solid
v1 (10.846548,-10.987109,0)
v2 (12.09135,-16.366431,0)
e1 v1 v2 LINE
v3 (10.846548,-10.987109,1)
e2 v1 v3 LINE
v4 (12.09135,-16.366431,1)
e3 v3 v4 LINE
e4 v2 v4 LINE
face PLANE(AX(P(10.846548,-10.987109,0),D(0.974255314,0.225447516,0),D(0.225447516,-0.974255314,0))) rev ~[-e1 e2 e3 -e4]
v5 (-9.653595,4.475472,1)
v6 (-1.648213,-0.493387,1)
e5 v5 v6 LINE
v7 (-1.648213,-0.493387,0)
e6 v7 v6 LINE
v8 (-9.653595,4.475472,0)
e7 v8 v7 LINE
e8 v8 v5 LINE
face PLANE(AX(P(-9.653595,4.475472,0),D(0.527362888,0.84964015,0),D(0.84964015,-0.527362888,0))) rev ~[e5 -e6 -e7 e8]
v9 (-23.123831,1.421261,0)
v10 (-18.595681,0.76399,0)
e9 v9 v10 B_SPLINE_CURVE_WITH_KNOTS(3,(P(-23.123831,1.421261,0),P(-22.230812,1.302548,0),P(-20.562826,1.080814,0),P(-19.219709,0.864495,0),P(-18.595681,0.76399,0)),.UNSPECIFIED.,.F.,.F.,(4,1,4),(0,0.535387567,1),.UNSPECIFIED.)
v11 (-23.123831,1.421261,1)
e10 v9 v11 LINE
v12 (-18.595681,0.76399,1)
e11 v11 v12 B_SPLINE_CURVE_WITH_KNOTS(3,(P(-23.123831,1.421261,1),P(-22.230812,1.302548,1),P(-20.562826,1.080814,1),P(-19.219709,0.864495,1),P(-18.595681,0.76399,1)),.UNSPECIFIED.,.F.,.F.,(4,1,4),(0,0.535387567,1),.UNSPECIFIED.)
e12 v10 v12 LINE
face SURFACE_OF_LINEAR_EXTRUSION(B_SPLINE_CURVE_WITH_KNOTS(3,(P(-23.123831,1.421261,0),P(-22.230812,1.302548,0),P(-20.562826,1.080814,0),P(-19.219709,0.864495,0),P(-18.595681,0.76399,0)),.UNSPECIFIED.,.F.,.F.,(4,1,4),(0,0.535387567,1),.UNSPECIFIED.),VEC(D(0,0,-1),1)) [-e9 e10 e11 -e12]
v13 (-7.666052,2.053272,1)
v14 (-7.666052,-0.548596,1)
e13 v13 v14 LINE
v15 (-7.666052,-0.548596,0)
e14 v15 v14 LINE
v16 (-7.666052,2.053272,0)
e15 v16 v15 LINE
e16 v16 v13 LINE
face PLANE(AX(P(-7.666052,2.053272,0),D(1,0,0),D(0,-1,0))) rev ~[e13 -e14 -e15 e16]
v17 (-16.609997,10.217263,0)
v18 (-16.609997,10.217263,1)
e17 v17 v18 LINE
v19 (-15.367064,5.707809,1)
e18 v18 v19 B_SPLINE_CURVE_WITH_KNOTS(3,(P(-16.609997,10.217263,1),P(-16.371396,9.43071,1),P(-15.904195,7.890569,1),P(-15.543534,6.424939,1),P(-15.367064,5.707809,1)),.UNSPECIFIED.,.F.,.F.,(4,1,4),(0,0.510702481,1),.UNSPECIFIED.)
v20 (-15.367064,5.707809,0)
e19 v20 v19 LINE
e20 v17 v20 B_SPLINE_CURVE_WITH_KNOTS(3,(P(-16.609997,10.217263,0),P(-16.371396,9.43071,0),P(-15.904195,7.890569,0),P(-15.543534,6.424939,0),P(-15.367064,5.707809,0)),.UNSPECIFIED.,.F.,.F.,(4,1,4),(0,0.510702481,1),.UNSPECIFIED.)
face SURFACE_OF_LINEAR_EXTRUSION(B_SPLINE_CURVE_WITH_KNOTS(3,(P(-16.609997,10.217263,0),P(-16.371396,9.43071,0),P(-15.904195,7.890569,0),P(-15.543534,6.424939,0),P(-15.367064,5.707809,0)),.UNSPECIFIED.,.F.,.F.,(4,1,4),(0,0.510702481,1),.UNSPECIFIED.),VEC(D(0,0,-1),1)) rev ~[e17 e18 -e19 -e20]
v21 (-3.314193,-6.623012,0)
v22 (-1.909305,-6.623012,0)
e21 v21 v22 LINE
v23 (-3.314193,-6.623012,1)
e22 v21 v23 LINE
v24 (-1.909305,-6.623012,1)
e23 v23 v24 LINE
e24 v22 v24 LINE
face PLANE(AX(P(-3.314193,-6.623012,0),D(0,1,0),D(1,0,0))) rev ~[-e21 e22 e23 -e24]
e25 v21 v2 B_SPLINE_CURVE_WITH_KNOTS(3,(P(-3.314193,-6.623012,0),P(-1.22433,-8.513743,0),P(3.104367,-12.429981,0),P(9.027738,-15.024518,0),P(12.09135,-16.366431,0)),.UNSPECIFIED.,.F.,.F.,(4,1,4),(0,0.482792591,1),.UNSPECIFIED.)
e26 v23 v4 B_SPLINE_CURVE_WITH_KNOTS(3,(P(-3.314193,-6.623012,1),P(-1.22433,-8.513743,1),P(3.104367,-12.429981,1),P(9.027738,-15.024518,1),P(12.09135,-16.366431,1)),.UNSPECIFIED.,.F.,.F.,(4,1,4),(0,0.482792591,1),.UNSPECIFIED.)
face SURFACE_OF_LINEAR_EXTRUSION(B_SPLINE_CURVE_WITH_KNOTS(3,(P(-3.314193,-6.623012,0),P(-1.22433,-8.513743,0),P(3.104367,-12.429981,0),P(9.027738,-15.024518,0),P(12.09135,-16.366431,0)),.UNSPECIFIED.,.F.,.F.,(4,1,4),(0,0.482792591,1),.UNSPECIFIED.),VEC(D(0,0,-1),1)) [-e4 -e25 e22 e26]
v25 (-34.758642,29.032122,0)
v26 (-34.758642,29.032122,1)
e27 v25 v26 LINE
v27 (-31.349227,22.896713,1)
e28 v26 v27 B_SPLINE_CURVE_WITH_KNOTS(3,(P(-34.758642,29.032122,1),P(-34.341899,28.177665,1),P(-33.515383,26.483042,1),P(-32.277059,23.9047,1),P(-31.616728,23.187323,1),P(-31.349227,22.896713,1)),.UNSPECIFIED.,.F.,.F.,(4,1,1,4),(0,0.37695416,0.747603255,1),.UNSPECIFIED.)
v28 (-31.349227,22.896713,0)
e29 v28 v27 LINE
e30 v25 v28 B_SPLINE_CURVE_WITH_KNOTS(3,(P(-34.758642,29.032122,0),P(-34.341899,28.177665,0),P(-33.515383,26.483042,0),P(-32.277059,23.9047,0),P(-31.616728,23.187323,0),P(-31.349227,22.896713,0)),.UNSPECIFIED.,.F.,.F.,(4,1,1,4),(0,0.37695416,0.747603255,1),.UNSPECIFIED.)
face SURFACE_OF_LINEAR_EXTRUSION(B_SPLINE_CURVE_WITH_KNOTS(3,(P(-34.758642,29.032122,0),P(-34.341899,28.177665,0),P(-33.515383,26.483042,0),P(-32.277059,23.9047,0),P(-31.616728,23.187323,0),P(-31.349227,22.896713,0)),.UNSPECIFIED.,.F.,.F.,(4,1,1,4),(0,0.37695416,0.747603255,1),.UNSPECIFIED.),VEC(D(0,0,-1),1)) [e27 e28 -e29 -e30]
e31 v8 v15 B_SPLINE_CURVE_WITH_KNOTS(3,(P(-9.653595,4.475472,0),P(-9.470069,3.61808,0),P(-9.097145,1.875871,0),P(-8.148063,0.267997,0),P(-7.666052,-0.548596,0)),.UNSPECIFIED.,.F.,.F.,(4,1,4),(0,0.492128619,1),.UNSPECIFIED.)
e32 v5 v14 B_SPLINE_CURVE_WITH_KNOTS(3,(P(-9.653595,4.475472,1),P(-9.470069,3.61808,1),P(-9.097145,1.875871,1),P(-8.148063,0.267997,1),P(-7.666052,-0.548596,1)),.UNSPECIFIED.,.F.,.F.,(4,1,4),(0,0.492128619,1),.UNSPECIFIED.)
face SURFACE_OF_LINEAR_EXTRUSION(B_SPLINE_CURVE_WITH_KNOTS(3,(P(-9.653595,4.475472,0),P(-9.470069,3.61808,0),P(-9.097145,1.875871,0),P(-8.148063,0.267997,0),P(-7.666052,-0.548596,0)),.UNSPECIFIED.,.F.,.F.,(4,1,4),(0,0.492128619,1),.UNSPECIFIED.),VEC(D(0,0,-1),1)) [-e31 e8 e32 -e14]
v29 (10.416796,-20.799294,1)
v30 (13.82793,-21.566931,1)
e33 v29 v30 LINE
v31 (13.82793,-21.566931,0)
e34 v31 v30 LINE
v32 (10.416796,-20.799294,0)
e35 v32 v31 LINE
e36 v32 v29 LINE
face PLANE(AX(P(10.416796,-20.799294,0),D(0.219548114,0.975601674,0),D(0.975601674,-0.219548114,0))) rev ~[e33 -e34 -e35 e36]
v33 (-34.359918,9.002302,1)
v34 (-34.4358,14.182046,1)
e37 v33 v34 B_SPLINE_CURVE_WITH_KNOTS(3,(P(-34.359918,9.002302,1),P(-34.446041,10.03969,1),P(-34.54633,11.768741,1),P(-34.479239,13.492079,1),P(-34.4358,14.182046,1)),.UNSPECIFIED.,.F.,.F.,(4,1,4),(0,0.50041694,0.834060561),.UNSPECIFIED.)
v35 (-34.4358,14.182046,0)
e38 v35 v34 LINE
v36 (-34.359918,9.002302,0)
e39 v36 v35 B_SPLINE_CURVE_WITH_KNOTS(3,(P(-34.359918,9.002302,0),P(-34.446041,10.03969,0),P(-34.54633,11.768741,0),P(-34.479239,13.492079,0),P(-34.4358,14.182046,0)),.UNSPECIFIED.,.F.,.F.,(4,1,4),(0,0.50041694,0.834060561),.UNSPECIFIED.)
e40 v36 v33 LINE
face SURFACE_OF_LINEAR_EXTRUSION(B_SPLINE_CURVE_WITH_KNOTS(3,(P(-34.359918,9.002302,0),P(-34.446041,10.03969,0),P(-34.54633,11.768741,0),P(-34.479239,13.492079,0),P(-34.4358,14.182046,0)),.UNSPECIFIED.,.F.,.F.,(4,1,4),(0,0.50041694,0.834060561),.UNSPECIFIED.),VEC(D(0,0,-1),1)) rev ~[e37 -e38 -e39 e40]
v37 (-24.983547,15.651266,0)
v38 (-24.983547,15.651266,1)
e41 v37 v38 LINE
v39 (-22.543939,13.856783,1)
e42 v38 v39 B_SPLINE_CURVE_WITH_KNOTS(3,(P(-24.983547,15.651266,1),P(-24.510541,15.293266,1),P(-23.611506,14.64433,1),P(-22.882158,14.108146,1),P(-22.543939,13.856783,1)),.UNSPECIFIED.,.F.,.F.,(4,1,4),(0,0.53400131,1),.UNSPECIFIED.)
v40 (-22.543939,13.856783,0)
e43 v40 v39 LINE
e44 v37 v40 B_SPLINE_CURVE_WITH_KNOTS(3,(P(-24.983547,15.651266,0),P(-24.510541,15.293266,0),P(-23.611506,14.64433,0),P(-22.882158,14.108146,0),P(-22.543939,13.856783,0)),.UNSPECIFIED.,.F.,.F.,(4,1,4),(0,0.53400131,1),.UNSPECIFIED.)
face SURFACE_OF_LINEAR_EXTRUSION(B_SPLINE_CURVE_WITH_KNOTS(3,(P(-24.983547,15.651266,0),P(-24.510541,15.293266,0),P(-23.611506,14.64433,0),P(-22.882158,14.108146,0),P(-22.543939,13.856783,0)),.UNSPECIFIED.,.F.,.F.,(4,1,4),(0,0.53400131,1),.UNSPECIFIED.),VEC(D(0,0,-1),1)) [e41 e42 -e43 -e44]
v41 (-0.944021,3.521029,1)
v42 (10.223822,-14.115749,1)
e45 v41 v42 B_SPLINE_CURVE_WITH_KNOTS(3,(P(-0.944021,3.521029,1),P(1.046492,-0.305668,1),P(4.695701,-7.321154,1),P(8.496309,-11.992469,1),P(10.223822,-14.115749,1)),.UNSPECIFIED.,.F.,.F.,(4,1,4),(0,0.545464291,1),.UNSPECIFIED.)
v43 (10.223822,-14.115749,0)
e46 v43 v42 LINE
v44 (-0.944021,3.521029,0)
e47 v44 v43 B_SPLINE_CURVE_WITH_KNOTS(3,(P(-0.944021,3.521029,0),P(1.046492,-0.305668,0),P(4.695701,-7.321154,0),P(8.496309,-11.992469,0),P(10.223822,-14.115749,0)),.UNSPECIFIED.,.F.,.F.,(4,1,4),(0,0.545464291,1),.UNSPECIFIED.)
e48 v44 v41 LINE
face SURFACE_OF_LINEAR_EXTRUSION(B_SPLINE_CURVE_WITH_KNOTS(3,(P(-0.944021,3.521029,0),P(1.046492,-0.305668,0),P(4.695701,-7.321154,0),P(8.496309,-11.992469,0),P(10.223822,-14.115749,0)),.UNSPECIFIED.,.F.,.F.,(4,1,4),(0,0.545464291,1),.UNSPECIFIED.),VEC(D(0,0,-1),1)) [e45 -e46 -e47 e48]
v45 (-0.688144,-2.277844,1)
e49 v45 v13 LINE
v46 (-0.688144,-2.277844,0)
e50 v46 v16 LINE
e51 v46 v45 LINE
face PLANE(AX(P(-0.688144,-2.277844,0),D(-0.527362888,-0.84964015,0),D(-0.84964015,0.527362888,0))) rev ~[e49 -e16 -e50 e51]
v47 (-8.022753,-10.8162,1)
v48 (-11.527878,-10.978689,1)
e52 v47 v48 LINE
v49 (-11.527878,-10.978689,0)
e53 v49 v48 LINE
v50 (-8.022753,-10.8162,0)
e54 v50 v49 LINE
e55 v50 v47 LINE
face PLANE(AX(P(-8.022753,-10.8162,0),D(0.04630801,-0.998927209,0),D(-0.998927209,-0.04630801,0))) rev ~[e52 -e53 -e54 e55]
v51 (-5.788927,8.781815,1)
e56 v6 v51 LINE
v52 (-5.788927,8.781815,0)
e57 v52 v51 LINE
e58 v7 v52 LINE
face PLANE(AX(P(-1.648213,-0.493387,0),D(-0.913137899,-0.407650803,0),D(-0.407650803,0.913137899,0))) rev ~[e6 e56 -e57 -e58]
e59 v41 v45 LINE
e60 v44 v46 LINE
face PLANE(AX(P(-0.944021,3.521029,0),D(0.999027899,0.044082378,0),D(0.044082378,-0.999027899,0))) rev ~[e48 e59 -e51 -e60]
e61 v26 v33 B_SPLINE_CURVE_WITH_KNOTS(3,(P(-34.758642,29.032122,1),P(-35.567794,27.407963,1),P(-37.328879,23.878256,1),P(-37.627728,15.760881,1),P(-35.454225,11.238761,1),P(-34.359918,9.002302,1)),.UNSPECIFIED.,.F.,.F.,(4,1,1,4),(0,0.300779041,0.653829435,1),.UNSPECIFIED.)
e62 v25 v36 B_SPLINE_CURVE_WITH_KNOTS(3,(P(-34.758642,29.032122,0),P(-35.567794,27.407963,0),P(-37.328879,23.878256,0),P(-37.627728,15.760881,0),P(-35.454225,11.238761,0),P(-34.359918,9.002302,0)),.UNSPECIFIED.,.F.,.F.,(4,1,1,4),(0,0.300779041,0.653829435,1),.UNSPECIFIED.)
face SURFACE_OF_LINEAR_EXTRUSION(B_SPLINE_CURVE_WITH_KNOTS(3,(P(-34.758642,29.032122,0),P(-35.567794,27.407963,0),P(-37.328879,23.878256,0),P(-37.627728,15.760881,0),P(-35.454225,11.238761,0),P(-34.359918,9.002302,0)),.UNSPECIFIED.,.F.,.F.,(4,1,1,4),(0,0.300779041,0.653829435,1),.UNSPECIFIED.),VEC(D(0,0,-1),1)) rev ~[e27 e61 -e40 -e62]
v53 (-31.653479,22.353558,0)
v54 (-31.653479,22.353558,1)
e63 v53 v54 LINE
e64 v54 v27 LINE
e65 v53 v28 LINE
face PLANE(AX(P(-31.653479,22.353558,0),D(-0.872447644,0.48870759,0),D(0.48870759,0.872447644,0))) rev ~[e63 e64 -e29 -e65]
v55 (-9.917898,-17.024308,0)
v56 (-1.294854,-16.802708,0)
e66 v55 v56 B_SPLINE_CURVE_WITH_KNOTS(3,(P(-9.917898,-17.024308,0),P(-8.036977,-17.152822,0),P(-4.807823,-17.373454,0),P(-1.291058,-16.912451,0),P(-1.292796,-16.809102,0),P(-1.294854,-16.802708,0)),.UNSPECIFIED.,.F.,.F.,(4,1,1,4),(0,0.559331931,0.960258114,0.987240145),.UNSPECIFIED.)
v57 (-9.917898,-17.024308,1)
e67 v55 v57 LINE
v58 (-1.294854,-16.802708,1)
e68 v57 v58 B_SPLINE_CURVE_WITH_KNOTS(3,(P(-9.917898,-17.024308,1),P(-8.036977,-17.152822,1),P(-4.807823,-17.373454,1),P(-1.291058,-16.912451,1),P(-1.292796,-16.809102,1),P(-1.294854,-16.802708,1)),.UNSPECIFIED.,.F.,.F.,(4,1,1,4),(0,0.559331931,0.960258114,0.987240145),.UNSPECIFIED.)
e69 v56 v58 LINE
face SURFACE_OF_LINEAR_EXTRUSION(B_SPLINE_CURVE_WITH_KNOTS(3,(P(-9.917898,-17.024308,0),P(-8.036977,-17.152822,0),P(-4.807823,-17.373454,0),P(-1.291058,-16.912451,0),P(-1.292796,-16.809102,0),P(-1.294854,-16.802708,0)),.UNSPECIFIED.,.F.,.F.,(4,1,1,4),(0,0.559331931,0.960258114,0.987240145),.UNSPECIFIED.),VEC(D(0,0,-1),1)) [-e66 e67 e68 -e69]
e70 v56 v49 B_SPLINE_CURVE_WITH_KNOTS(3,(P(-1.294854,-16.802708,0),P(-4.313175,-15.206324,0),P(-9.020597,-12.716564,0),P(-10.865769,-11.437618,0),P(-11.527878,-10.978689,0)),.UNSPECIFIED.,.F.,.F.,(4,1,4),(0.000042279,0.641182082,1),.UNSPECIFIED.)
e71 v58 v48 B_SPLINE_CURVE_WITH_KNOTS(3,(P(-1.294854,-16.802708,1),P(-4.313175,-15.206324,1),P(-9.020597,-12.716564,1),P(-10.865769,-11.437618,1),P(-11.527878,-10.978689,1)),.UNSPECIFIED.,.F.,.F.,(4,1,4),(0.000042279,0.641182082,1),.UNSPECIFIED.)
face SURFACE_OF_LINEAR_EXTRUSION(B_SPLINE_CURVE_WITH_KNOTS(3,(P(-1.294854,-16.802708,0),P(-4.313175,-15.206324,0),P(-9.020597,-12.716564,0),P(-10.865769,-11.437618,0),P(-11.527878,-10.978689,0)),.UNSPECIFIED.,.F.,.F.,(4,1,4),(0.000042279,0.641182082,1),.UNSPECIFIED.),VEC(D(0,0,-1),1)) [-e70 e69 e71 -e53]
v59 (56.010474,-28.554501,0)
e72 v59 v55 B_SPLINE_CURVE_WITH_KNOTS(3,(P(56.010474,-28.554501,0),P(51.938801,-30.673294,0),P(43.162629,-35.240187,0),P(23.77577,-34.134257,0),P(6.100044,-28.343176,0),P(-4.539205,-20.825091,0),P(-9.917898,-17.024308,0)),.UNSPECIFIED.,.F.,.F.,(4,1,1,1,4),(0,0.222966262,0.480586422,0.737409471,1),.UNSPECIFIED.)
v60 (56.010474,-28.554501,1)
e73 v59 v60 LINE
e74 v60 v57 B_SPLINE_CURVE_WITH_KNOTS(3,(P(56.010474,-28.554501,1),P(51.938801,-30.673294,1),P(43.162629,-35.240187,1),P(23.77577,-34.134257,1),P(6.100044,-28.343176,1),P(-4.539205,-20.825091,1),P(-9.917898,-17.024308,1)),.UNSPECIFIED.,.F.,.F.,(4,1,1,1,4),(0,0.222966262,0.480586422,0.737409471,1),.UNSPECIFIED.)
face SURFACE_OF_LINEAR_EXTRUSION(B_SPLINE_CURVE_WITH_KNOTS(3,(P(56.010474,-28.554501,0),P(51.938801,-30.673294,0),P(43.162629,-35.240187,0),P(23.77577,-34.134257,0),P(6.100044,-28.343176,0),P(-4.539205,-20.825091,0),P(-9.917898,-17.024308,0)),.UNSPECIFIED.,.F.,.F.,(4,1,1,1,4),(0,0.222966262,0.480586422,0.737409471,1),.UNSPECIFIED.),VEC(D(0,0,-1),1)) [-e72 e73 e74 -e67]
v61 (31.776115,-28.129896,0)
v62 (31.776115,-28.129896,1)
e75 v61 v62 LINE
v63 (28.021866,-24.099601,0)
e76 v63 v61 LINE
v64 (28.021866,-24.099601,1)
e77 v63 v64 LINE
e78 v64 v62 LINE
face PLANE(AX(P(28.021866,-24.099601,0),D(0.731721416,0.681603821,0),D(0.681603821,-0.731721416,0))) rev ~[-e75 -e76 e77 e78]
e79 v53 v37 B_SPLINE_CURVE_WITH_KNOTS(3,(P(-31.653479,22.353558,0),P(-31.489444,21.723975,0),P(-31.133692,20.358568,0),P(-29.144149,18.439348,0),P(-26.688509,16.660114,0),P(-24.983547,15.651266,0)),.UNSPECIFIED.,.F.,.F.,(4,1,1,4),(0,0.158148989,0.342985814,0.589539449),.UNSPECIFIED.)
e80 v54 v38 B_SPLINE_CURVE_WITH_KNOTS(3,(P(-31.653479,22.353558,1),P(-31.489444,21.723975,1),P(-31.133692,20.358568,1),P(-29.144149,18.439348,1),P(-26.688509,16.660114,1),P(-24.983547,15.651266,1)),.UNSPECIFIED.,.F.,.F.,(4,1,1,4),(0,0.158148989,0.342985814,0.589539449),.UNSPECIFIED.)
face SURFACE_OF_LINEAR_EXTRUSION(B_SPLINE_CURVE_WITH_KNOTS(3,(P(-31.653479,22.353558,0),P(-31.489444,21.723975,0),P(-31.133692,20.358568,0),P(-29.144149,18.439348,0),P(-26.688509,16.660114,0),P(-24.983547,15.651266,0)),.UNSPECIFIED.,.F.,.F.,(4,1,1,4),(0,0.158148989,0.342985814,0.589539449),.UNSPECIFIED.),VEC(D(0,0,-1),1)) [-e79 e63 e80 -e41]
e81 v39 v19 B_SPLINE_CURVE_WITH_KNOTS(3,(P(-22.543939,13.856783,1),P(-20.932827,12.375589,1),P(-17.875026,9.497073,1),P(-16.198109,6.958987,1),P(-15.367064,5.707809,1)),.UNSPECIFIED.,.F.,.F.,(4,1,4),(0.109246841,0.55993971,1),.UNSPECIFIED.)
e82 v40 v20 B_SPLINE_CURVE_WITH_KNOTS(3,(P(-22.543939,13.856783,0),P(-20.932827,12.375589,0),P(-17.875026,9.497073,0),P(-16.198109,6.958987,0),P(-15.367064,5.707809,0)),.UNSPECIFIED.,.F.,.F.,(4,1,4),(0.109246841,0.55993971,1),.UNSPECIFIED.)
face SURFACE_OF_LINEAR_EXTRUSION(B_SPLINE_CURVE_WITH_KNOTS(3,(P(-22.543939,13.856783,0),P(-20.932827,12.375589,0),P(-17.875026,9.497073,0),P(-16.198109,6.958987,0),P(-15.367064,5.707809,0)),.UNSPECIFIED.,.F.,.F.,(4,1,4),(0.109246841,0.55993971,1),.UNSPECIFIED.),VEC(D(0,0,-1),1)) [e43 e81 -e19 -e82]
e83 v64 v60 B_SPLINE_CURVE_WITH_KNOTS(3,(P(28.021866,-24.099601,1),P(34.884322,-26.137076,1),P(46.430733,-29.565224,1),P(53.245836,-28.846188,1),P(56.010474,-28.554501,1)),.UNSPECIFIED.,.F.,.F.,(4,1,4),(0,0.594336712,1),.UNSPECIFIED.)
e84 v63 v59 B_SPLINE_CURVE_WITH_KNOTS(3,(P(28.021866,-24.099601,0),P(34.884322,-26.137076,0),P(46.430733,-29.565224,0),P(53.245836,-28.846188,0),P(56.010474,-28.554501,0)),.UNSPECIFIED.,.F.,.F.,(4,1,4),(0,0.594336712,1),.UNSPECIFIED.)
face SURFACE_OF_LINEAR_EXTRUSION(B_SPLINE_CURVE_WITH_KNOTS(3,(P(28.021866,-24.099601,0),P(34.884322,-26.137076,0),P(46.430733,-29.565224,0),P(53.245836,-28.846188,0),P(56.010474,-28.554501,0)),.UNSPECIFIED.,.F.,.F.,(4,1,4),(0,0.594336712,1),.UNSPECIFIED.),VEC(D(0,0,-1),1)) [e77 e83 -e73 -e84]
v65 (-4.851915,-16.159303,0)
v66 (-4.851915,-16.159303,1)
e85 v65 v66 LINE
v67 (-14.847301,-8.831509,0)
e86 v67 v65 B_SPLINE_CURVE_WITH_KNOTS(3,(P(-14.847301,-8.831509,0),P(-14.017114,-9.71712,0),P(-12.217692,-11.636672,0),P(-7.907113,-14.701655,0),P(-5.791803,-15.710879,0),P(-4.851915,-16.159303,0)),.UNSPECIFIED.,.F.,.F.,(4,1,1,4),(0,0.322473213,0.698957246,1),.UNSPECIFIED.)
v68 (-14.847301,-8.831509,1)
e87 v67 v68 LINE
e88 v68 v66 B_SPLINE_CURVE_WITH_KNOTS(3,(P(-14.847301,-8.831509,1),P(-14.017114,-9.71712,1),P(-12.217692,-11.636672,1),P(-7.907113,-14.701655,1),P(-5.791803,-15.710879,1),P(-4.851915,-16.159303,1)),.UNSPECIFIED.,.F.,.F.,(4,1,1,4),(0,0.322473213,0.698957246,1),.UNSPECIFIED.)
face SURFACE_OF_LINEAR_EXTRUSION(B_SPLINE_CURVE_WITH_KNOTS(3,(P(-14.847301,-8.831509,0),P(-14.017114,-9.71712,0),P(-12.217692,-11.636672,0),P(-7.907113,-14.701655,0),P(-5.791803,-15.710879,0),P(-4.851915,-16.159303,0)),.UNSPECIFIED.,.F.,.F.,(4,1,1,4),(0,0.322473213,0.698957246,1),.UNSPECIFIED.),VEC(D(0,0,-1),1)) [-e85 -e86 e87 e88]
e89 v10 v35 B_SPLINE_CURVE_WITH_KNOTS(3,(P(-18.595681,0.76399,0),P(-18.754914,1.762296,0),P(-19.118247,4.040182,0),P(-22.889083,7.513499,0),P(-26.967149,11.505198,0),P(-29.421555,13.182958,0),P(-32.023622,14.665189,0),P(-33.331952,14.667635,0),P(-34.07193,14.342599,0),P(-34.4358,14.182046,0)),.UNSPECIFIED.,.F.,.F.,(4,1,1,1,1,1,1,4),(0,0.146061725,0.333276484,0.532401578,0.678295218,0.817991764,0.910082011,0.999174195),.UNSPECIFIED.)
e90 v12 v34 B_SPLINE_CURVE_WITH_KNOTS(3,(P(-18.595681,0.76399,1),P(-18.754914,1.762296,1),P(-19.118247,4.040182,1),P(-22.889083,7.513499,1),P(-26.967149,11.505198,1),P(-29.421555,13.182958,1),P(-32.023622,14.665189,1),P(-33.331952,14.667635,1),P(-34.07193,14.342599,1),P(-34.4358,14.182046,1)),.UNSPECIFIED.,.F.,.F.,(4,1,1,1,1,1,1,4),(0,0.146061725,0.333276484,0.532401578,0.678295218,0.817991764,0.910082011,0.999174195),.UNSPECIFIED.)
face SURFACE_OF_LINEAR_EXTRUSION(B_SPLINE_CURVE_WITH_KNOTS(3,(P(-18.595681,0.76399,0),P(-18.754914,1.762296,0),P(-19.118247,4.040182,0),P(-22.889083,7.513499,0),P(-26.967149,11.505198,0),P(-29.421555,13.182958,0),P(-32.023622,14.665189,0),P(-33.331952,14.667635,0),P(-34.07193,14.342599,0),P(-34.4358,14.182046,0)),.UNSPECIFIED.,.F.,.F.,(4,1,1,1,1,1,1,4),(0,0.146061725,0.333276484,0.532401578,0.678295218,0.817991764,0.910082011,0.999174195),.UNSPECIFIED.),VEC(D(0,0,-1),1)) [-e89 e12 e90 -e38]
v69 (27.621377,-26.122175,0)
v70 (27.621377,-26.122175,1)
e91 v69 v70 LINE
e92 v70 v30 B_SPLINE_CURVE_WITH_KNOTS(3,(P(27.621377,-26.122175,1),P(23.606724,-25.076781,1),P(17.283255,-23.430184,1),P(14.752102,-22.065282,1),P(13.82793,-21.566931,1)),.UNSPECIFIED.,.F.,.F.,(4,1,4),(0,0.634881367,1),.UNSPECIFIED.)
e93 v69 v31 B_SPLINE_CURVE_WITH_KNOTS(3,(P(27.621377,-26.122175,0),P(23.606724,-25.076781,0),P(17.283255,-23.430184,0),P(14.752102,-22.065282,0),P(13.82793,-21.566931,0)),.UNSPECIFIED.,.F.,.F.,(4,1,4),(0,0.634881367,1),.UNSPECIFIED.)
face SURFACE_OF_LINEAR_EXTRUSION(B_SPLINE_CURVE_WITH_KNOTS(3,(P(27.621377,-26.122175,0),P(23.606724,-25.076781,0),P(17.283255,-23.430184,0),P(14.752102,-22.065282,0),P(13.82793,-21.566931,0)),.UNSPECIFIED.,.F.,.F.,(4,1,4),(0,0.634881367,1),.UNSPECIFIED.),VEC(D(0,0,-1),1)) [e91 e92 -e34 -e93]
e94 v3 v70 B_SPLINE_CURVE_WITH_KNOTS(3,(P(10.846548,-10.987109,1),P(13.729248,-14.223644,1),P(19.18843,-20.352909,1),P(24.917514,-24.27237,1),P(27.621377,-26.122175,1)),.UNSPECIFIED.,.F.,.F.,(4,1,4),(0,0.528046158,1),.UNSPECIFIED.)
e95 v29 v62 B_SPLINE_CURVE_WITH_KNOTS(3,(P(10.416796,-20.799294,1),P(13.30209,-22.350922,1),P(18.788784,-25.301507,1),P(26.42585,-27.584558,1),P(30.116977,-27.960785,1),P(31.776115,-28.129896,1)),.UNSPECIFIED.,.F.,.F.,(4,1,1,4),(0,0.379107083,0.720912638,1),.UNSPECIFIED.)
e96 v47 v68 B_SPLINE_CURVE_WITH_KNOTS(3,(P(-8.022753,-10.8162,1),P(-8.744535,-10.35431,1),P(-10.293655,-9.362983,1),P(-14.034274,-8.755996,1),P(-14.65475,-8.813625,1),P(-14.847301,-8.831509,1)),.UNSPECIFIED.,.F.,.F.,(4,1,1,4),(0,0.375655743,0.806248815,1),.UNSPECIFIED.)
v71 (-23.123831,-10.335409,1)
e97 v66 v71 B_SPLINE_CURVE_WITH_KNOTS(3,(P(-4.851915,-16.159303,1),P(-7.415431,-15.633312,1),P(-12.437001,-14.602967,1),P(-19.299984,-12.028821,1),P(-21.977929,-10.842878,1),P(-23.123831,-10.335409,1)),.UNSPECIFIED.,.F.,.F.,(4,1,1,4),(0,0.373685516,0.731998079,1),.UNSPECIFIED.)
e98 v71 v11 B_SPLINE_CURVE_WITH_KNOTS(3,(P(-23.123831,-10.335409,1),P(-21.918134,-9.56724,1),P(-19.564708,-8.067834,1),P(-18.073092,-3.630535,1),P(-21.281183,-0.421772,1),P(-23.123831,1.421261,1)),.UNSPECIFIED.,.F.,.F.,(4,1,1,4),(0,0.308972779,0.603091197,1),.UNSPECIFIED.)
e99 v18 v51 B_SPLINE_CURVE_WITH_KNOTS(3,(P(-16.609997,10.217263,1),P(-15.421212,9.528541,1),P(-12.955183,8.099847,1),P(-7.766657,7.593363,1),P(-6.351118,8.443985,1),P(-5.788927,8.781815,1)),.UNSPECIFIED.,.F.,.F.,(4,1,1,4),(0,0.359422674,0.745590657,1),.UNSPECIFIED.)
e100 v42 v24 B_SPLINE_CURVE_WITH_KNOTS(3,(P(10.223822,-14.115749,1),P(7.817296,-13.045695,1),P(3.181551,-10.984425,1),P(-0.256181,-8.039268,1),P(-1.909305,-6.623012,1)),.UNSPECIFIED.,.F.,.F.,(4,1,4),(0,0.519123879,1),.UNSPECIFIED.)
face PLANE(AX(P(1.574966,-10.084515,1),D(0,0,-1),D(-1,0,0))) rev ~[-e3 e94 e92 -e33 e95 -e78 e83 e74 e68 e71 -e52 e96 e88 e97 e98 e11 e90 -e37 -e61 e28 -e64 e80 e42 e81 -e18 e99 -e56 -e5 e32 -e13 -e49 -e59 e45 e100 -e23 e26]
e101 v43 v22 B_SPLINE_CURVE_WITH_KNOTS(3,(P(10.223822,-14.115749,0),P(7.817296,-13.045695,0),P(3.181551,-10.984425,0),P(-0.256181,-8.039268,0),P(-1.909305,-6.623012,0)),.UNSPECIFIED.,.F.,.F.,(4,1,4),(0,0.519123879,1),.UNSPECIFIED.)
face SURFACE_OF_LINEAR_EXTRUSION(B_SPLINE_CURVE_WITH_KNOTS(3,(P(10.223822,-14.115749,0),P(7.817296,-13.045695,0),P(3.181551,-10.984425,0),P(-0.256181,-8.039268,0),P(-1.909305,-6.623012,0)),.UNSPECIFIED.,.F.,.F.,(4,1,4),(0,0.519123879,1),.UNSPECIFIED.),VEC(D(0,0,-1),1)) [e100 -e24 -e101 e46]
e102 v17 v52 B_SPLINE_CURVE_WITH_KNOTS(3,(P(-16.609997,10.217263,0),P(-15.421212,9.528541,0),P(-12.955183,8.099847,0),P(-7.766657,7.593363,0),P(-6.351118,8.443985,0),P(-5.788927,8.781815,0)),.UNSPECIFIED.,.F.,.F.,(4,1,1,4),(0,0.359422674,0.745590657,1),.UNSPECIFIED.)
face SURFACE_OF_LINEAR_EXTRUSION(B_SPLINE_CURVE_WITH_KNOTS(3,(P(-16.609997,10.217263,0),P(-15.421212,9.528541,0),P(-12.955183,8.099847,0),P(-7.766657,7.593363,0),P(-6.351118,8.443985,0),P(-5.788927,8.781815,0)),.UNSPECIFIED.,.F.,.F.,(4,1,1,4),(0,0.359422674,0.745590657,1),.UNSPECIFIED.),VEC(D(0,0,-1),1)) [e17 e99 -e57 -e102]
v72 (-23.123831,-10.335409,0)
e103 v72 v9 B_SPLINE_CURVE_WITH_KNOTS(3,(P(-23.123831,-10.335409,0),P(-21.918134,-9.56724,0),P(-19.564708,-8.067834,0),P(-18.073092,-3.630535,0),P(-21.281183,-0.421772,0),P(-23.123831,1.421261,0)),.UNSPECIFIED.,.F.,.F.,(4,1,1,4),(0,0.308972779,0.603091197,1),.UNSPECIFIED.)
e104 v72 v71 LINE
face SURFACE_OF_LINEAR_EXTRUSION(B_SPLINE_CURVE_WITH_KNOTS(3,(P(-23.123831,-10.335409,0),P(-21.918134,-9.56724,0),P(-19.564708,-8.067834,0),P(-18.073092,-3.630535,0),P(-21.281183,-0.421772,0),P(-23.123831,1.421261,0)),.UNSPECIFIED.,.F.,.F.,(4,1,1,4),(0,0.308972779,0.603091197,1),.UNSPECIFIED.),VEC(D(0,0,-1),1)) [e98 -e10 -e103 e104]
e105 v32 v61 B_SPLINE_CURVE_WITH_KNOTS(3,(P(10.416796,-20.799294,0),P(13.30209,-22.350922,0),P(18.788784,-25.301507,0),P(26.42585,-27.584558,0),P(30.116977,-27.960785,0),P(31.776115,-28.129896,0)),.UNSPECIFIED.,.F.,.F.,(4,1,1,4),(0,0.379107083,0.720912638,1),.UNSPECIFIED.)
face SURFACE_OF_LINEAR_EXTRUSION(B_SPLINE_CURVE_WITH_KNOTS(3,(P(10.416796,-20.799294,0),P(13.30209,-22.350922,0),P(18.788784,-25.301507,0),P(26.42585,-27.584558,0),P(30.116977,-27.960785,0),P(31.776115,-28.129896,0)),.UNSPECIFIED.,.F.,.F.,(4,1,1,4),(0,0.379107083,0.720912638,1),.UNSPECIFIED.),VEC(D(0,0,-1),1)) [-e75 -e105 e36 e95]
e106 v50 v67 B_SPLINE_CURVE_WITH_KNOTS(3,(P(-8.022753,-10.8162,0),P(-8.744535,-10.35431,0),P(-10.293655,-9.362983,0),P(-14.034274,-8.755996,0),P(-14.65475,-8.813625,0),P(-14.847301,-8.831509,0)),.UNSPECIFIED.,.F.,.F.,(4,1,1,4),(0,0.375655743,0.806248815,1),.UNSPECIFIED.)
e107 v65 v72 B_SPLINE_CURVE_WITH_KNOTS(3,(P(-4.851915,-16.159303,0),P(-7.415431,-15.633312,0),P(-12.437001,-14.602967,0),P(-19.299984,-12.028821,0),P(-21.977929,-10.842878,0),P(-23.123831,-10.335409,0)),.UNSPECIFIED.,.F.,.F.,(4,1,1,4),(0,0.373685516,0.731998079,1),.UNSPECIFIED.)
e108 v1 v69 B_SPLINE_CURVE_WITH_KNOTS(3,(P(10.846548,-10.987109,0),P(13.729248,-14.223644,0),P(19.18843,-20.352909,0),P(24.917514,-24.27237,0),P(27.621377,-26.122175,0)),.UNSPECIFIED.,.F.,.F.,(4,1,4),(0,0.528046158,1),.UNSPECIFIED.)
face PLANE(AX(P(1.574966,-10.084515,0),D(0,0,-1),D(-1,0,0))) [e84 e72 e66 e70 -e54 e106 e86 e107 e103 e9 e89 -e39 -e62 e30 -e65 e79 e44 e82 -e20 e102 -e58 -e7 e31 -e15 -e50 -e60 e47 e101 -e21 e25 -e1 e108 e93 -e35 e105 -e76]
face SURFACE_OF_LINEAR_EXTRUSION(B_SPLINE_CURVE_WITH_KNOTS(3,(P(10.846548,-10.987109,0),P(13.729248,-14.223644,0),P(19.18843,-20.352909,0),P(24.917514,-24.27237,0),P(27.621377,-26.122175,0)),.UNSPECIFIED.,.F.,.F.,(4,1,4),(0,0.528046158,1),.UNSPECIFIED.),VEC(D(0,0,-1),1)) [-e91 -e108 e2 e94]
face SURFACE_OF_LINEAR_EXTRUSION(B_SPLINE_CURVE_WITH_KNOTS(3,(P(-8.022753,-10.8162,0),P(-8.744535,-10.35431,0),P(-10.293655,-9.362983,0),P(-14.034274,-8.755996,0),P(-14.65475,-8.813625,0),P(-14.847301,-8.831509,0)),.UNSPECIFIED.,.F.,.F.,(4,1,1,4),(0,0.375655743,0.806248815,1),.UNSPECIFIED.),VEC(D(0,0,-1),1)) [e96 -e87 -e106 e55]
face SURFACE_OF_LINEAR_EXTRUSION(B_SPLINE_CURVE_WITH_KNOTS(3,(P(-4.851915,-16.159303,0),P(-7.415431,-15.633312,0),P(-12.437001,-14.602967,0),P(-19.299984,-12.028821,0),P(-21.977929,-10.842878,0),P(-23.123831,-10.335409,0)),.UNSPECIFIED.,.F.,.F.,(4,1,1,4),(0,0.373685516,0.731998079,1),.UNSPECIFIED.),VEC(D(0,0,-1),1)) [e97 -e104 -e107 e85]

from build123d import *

# Parameters (mm, degrees)
F1_DEPTH = 1


# Not quite as in the source:
# - a feature names something its author has since deleted; it is built from what else it names


with BuildPart() as f1:
    # F0 (on Top) → F1 (new body)
    with BuildSketch(Plane.XY):
        with BuildLine():
            add(Edge.make_bspline(
                [(-16.6099965572, 10.2172633633), (-15.4212118205, 9.5285409053), (-12.9551826674, 8.0998468723), (-7.766656534, 7.5933629956), (-6.3511176621, 8.4439850217), (-5.7889274321, 8.7818149477)],
                knots=[0, 0, 0, 0, 0.3594226743, 0.7455906573, 1, 1, 1, 1], degree=3))
            add(Edge.make_bspline(
                [(-16.6099965572, 10.2172633633), (-16.3713958805, 9.4307097449), (-15.904194945, 7.8905691575), (-15.5435341339, 6.4249386215), (-15.3670636937, 5.7078092359)],
                knots=[0, 0, 0, 0, 0.5107024806, 1, 1, 1, 1], degree=3))
            add(Edge.make_bspline(
                [(-22.5439389952, 13.8567826848), (-20.9328268461, 12.3755889493), (-17.8750260099, 9.497072632), (-16.1981091624, 6.9589873468), (-15.3670636937, 5.7078092359)],
                knots=[0.1092468408, 0.1092468408, 0.1092468408, 0.1092468408, 0.5599397099, 1, 1, 1, 1], degree=3))
            add(Edge.make_bspline(
                [(-24.9835465397, 15.6512659715), (-24.5105414607, 15.2932659882), (-23.6115055046, 14.644329683), (-22.8821580713, 14.1081462449), (-22.5439389952, 13.8567826848)],
                knots=[0, 0, 0, 0, 0.5340013105, 1, 1, 1, 1], degree=3))
            add(Edge.make_bspline(
                [(-31.6534787416, 22.3535578698), (-31.4894436188, 21.7239753561), (-31.1336922454, 20.3585675093), (-29.1441485457, 18.4393483759), (-26.688509429, 16.66011353), (-24.9835465397, 15.6512659715)],
                knots=[0, 0, 0, 0, 0.1581489893, 0.342985814, 0.5895394489, 0.5895394489, 0.5895394489, 0.5895394489], degree=3))
            Line((-31.6534787416, 22.3535578698), (-31.3492268324, 22.8967126459))
            add(Edge.make_bspline(
                [(-34.7586423159, 29.0321223438), (-34.3418990536, 28.1776650529), (-33.5153831208, 26.4830424187), (-32.2770591236, 23.9047003589), (-31.6167279276, 23.1873231579), (-31.3492268324, 22.8967126459)],
                knots=[0, 0, 0, 0, 0.3769541602, 0.747603255, 1, 1, 1, 1], degree=3))
            add(Edge.make_bspline(
                [(-34.7586423159, 29.0321223438), (-35.5677944518, 27.4079633385), (-37.3288786405, 23.8782557478), (-37.627728367, 15.760880925), (-35.454224769, 11.2387606607), (-34.3599178116, 9.002301842)],
                knots=[0, 0, 0, 0, 0.3007790413, 0.6538294353, 1, 1, 1, 1], degree=3))
            add(Edge.make_bspline(
                [(-34.3599178116, 9.002301842), (-34.4460411955, 10.0396901503), (-34.5463298451, 11.768741471), (-34.4792390008, 13.4920788706), (-34.4357995181, 14.1820461029)],
                knots=[0, 0, 0, 0, 0.5004169403, 0.8340605609, 0.8340605609, 0.8340605609, 0.8340605609], degree=3))
            add(Edge.make_bspline(
                [(-18.5956805944, 0.7639901596), (-18.754914474, 1.762296212), (-19.1182465354, 4.0401820297), (-22.8890828074, 7.5134991963), (-26.9671489576, 11.505197563), (-29.4215545254, 13.182958406), (-32.0236221513, 14.6651885876), (-33.3319524476, 14.6676349212), (-34.0719301846, 14.3425994686), (-34.4357995181, 14.1820461029)],
                knots=[0, 0, 0, 0, 0.1460617246, 0.3332764838, 0.5324015784, 0.6782952182, 0.8179917645, 0.9100820113, 0.9991741954, 0.9991741954, 0.9991741954, 0.9991741954], degree=3))
            add(Edge.make_bspline(
                [(-23.1238305569, 1.4212612296), (-22.2308115866, 1.302547656), (-20.5628255796, 1.0808137554), (-19.2197091749, 0.8644946878), (-18.5956805944, 0.7639901596)],
                knots=[0, 0, 0, 0, 0.5353875671, 1, 1, 1, 1], degree=3))
            add(Edge.make_bspline(
                [(-23.1238305569, -10.3354090825), (-21.9181343668, -9.5672404628), (-19.5647077627, -8.0678341604), (-18.0730916869, -3.6305347437), (-21.2811829424, -0.4217720451), (-23.1238305569, 1.4212612296)],
                knots=[0, 0, 0, 0, 0.3089727792, 0.603091197, 1, 1, 1, 1], degree=3))
            add(Edge.make_bspline(
                [(-4.8519154079, -16.1593034863), (-7.4154305721, -15.6333116353), (-12.4370011009, -14.6029665784), (-19.2999839188, -12.0288214544), (-21.9779293524, -10.8428779902), (-23.1238305569, -10.3354090825)],
                knots=[0, 0, 0, 0, 0.3736855161, 0.7319980787, 1, 1, 1, 1], degree=3))
            add(Edge.make_bspline(
                [(-14.8473009467, -8.831509389), (-14.0171136981, -9.7171202904), (-12.2176917006, -11.6366724638), (-7.9071133303, -14.7016545165), (-5.7918028227, -15.7108788812), (-4.8519154079, -16.1593034863)],
                knots=[0, 0, 0, 0, 0.322473213, 0.6989572463, 1, 1, 1, 1], degree=3))
            add(Edge.make_bspline(
                [(-8.0227525905, -10.816199705), (-8.7445347825, -10.3543101709), (-10.2936553467, -9.3629826161), (-14.0342744282, -8.7559960985), (-14.6547502449, -8.8136254249), (-14.8473009467, -8.831509389)],
                knots=[0, 0, 0, 0, 0.3756557433, 0.806248815, 1, 1, 1, 1], degree=3))
            Line((-8.0227525905, -10.816199705), (-11.5278782323, -10.9786894172))
            add(Edge.make_bspline(
                [(-1.2948540742, -16.8027080712), (-4.3131749279, -15.2063237418), (-9.020596995, -12.7165640866), (-10.8657693402, -11.4376176997), (-11.5278782323, -10.9786894172)],
                knots=[4.22789e-05, 4.22789e-05, 4.22789e-05, 4.22789e-05, 0.6411820822, 1, 1, 1, 1], degree=3))
            add(Edge.make_bspline(
                [(-9.9178981036, -17.0243084431), (-8.0369774486, -17.152822121), (-4.8078227744, -17.3734537264), (-1.2910580124, -16.912451153), (-1.2927963607, -16.8091016917), (-1.2948540742, -16.8027080712)],
                knots=[0, 0, 0, 0, 0.5593319314, 0.960258114, 0.9872401448, 0.9872401448, 0.9872401448, 0.9872401448], degree=3))
            add(Edge.make_bspline(
                [(56.0104735196, -28.554501012), (51.9388012895, -30.6732939687), (43.1626287248, -35.2401872663), (23.7757696907, -34.1342565116), (6.1000439104, -28.3431760834), (-4.5392052922, -20.825090838), (-9.9178981036, -17.0243084431)],
                knots=[0, 0, 0, 0, 0.2229662615, 0.4805864215, 0.7374094706, 1, 1, 1, 1], degree=3))
            add(Edge.make_bspline(
                [(28.0218664557, -24.0996014327), (34.8843220952, -26.1370758676), (46.4307325782, -29.5652242463), (53.2458361821, -28.8461877297), (56.0104735196, -28.554501012)],
                knots=[0, 0, 0, 0, 0.5943367118, 1, 1, 1, 1], degree=3))
            Line((28.0218664557, -24.0996014327), (31.7761152983, -28.129896149))
            add(Edge.make_bspline(
                [(10.4167964309, -20.7992941141), (13.3020900166, -22.350921559), (18.7887841643, -25.301506991), (26.4258501352, -27.584558387), (30.1169773998, -27.9607848021), (31.7761152983, -28.129896149)],
                knots=[0, 0, 0, 0, 0.3791070825, 0.7209126382, 1, 1, 1, 1], degree=3))
            Line((10.4167964309, -20.7992941141), (13.8279302046, -21.5669311583))
            add(Edge.make_bspline(
                [(27.6213772595, -26.1221751571), (23.6067244924, -25.076781429), (17.2832552929, -23.4301844692), (14.7521015867, -22.0652823535), (13.8279302046, -21.5669311583)],
                knots=[0, 0, 0, 0, 0.6348813666, 1, 1, 1, 1], degree=3))
            add(Edge.make_bspline(
                [(10.8465477824, -10.9871085733), (13.7292478088, -14.2236435187), (19.1884297009, -20.3529087233), (24.9175139429, -24.2723702383), (27.6213772595, -26.1221751571)],
                knots=[0, 0, 0, 0, 0.5280461584, 1, 1, 1, 1], degree=3))
            Line((10.8465477824, -10.9871085733), (12.0913498104, -16.3664314896))
            add(Edge.make_bspline(
                [(-3.3141928725, -6.6230124794), (-1.2243299559, -8.513743245), (3.1043671989, -12.4299813966), (9.0277383612, -15.0245179581), (12.0913498104, -16.3664314896)],
                knots=[0, 0, 0, 0, 0.4827925914, 1, 1, 1, 1], degree=3))
            Line((-3.3141928725, -6.6230124794), (-1.909304643, -6.6230124794))
            add(Edge.make_bspline(
                [(10.2238217369, -14.115748927), (7.8172960071, -13.0456945157), (3.181551384, -10.9844246435), (-0.2561811543, -8.0392679882), (-1.909304643, -6.6230124794)],
                knots=[0, 0, 0, 0, 0.5191238788, 1, 1, 1, 1], degree=3))
            add(Edge.make_bspline(
                [(-0.9440209251, 3.5210286733), (1.0464920899, -0.3056682218), (4.6957007503, -7.3211538505), (8.4963093931, -11.9924692639), (10.2238217369, -14.115748927)],
                knots=[0, 0, 0, 0, 0.5454642911, 1, 1, 1, 1], degree=3))
            Line((-0.9440209251, 3.5210286733), (-0.6881441002, -2.2778437083))
            Line((-0.6881441002, -2.2778437083), (-7.6660518534, 2.0532717463))
            Line((-7.6660518534, 2.0532717463), (-7.6660518534, -0.5485964357))
            add(Edge.make_bspline(
                [(-9.6535952762, 4.4754715636), (-9.4700688508, 3.6180804257), (-9.0971451505, 1.8758709595), (-8.1480633424, 0.2679968231), (-7.6660518534, -0.5485964357)],
                knots=[0, 0, 0, 0, 0.4921286186, 1, 1, 1, 1], degree=3))
            Line((-9.6535952762, 4.4754715636), (-1.648212783, -0.4933868768))
            Line((-1.648212783, -0.4933868768), (-5.7889274321, 8.7818149477))
        make_face()
    extrude(amount=F1_DEPTH)


solid = f1.part
